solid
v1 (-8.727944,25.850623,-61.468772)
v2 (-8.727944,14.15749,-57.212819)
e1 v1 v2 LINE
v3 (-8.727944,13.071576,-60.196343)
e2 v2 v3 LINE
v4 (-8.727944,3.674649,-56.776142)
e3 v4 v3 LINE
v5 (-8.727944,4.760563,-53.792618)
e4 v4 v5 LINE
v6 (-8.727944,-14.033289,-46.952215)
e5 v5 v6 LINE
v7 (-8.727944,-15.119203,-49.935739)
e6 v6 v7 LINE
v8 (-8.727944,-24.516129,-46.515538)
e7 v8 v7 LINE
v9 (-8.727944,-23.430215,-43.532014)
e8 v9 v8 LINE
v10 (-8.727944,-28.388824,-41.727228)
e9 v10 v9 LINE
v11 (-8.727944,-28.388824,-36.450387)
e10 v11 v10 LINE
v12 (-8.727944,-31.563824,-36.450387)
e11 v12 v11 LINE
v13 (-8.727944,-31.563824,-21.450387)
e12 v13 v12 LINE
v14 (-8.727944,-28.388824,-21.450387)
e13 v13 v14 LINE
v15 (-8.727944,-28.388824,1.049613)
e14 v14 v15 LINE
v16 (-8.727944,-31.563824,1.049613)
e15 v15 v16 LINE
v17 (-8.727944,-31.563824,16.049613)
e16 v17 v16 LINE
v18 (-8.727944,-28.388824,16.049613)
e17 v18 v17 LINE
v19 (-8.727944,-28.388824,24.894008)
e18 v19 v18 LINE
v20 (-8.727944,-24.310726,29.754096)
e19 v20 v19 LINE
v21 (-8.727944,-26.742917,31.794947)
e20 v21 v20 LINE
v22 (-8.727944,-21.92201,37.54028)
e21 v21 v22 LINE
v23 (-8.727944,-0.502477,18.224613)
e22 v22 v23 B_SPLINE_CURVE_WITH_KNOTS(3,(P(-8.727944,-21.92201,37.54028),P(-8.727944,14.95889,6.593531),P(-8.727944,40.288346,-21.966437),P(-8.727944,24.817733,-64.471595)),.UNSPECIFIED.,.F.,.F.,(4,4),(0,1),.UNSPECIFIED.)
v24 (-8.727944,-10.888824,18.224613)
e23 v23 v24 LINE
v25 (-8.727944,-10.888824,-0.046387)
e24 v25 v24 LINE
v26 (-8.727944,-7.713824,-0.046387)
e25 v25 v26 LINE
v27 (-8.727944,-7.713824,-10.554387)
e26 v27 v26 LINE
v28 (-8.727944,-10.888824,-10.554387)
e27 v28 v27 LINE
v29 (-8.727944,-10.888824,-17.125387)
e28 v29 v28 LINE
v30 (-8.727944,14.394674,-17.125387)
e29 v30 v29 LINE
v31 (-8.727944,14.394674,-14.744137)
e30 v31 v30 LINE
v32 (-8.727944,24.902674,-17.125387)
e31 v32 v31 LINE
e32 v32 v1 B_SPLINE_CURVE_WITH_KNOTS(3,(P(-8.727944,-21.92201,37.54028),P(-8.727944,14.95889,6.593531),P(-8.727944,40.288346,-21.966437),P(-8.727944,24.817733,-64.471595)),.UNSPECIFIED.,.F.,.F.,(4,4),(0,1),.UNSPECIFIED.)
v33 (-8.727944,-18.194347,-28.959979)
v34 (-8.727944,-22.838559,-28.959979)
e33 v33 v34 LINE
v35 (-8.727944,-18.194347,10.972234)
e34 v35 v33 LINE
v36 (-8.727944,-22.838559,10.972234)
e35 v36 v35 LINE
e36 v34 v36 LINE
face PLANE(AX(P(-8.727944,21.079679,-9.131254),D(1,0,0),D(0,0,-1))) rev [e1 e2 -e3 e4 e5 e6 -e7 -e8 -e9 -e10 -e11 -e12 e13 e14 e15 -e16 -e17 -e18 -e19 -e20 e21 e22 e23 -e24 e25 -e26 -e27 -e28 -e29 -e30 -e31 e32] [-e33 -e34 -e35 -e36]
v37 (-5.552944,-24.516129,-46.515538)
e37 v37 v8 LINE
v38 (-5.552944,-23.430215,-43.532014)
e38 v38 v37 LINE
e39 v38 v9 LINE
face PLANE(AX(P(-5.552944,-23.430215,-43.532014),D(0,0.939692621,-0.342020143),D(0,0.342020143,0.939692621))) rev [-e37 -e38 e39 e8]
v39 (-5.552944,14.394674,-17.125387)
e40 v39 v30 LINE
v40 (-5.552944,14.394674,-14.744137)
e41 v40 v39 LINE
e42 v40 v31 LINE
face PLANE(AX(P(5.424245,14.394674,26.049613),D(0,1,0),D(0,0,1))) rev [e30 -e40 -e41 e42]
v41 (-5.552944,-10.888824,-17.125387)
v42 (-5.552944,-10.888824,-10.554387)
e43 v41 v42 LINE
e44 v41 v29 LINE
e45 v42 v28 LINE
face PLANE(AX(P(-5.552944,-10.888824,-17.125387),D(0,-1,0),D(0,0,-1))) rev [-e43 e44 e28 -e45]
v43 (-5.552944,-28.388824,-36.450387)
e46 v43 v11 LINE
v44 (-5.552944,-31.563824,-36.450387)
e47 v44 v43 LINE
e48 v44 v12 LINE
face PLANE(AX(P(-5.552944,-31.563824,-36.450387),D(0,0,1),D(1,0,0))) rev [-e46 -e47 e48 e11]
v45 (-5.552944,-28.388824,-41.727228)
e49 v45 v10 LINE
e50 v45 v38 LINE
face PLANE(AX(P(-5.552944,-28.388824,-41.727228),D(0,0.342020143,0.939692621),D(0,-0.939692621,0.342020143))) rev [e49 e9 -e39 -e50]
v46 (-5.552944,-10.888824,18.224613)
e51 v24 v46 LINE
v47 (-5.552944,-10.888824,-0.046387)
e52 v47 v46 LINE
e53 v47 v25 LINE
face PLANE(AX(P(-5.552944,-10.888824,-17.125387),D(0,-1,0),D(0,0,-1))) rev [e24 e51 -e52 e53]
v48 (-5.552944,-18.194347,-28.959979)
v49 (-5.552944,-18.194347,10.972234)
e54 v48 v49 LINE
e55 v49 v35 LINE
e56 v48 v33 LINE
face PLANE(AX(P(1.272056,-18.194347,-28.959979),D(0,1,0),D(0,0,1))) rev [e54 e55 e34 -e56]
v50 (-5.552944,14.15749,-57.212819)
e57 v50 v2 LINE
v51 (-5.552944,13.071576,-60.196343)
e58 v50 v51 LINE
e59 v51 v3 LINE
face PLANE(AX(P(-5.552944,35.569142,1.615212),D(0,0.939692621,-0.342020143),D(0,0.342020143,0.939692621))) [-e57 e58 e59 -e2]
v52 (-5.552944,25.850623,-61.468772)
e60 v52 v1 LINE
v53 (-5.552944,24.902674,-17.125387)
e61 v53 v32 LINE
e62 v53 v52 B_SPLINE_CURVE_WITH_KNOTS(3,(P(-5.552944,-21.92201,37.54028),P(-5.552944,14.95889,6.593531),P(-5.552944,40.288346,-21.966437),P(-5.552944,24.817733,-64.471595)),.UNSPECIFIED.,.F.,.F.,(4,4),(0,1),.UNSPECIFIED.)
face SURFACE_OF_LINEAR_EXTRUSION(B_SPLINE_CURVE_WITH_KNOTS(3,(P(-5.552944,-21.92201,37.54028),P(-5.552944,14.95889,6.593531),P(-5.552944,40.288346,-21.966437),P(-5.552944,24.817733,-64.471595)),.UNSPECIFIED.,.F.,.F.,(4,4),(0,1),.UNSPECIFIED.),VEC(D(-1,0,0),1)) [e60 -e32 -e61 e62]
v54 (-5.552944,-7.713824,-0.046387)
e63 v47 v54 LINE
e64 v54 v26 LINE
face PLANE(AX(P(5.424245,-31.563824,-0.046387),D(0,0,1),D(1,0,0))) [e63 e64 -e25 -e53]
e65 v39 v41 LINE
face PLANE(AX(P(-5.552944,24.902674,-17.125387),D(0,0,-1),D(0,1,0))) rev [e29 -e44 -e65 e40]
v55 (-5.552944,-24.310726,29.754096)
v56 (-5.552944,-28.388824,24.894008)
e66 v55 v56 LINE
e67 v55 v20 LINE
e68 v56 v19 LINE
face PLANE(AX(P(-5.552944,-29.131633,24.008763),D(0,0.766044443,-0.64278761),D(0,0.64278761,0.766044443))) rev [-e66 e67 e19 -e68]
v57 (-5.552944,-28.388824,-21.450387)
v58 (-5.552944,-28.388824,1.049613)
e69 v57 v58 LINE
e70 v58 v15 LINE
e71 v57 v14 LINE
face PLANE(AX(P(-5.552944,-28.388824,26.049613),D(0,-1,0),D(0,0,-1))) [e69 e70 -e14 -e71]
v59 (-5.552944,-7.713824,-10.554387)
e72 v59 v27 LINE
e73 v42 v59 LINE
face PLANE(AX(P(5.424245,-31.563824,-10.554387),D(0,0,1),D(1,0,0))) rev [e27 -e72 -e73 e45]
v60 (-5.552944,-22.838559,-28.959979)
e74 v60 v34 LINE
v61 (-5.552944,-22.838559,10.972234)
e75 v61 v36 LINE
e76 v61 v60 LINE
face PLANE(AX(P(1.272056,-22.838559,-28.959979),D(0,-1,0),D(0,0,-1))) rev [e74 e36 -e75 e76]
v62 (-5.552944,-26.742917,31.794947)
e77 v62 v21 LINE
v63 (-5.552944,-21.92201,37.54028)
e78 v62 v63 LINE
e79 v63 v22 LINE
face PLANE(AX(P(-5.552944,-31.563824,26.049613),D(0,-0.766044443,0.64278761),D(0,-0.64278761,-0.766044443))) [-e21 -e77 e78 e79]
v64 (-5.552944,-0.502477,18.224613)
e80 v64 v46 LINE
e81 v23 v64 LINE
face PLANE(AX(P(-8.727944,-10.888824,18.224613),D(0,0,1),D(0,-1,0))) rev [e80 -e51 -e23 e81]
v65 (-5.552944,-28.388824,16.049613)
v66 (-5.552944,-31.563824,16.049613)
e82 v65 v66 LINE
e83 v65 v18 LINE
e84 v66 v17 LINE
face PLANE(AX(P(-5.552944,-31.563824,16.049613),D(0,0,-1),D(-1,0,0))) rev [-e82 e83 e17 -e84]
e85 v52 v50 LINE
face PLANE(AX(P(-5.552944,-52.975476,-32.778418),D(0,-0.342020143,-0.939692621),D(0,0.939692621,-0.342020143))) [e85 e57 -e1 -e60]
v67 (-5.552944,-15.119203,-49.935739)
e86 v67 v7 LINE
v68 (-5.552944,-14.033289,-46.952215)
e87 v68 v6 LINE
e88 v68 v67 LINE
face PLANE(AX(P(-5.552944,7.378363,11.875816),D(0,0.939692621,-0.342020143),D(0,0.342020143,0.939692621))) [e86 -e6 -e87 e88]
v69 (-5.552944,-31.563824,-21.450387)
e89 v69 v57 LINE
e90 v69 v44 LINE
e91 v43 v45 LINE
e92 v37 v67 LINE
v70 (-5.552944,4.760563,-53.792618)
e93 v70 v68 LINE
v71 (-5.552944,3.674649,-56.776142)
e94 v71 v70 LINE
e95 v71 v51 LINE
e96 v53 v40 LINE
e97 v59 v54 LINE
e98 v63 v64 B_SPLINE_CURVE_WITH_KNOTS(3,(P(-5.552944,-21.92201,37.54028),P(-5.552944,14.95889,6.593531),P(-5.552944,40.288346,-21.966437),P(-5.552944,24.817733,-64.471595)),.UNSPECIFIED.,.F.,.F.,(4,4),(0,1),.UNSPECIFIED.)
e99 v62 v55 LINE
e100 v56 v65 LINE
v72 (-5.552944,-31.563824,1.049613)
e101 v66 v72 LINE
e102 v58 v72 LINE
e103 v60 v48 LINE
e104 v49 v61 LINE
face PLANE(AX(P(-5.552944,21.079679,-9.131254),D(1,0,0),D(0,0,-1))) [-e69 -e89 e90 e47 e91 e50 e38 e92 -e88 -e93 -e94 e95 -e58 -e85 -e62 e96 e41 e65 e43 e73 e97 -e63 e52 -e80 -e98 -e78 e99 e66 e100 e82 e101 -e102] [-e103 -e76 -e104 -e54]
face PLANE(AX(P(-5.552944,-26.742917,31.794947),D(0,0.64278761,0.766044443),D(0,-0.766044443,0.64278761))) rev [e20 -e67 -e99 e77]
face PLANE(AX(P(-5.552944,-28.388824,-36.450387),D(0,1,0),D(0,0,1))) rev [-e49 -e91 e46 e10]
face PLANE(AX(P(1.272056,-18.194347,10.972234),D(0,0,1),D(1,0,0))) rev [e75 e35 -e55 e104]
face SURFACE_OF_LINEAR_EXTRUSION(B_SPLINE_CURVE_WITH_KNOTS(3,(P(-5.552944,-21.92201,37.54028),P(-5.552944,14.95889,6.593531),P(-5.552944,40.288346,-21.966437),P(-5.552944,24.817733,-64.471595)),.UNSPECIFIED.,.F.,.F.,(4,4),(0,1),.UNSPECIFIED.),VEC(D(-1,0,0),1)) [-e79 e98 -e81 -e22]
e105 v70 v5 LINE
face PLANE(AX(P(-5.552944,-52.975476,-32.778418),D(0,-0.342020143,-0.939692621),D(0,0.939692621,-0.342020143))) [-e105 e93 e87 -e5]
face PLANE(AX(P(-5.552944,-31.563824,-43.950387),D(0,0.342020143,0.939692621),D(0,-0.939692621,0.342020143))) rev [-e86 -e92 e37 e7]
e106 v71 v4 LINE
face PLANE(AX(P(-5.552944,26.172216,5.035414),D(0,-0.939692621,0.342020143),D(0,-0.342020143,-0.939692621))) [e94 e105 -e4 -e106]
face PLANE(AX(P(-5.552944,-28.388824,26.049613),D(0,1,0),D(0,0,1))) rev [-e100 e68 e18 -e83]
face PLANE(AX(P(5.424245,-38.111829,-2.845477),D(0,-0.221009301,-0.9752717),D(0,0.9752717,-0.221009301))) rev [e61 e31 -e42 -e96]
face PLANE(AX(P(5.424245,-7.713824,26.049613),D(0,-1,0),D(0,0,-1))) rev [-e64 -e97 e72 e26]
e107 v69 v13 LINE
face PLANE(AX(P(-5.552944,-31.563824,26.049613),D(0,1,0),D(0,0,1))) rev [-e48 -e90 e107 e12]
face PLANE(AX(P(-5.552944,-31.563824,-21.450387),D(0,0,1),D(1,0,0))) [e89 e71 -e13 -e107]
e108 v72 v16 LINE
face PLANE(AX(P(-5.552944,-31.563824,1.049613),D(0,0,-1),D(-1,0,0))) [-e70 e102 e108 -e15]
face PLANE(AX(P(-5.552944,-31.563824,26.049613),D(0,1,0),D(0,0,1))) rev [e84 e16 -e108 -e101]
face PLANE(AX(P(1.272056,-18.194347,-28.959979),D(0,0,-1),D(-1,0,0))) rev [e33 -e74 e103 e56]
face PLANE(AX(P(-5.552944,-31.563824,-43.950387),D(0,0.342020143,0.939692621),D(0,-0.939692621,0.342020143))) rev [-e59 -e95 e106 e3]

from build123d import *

# Parameters (mm, degrees)
VERTICALSUPPORT_START     = -8.727944435
VERTICALSUPPORT_OUTLINE_W = 4.644211625
VERTICALSUPPORT_OUTLINE_H = 39.932212354
VERTICALSUPPORT_DEPTH     = 3.175
SKETCH1_W                 = 7.5
SKETCH1_H                 = 17.511250173
CUT_EXTRUDE1_DEPTH        = 70.171999778


# Read off the part's stored shape, not the designer's step: VerticalSupport
with BuildPart() as part:
    # VerticalSupport outline → VerticalSupport (new body)
    with BuildSketch(Plane.YZ.offset(VERTICALSUPPORT_START)):
        with BuildLine():
            Line((3.674649338, -56.776141905), (13.071575546, -60.196343338))
            Line((13.071575546, -60.196343338), (14.157489501, -57.212819267))
            Line((14.157489501, -57.212819267), (25.850623416, -61.468771968))
            add(Edge.make_bspline(
                [(24.902673716, -17.12538653), (30.294038787, -30.457344803), (31.214851934, -44.900745737), (25.850623416, -61.468771968)],
                knots=[0.580400882, 0.580400882, 0.580400882, 0.580400882, 0.976268241, 0.976268241, 0.976268241, 0.976268241], degree=3))
            Line((24.902673716, -17.12538653), (14.394673716, -14.74413653))
            Line((14.394673716, -14.74413653), (14.394673716, -17.12538653))
            Line((14.394673716, -17.12538653), (-10.888823942, -17.12538653))
            Line((-10.888823942, -17.12538653), (-10.888823942, -10.55438653))
            Line((-10.888823942, -10.55438653), (-7.713823942, -10.55438653))
            Line((-7.713823942, -10.55438653), (-7.713823942, -0.04638653))
            Line((-7.713823942, -0.04638653), (-10.888823942, -0.04638653))
            Line((-10.888823942, -0.04638653), (-10.888823942, 10.72461347))
            Line((-10.888823942, 10.72461347), (6.622426231, 10.72461347))
            add(Edge.make_bspline(
                [(-21.922009797, 37.540280116), (-11.188458316, 28.533761028), (-1.433315203, 19.729402601), (6.622426231, 10.72461347)],
                knots=[0, 0, 0, 0, 0.291032797, 0.291032797, 0.291032797, 0.291032797], degree=3))
            Line((-21.922009797, 37.540280116), (-26.742916869, 31.794946793))
            Line((-26.742916869, 31.794946793), (-24.310725762, 29.754096132))
            Line((-24.310725762, 29.754096132), (-28.388823942, 24.894007976))
            Line((-28.388823942, 24.894007976), (-28.388823942, 16.04961347))
            Line((-28.388823942, 16.04961347), (-31.563823942, 16.04961347))
            Line((-31.563823942, 16.04961347), (-31.563823942, 1.04961347))
            Line((-31.563823942, 1.04961347), (-28.388823942, 1.04961347))
            Line((-28.388823942, 1.04961347), (-28.388823942, -21.45038653))
            Line((-28.388823942, -21.45038653), (-31.563823942, -21.45038653))
            Line((-31.563823942, -21.45038653), (-31.563823942, -36.45038653))
            Line((-31.563823942, -36.45038653), (-28.388823942, -36.45038653))
            Line((-28.388823942, -36.45038653), (-28.388823942, -41.727227597))
            Line((-28.388823942, -41.727227597), (-23.430215331, -43.532013534))
            Line((-23.430215331, -43.532013534), (-24.516129286, -46.515537605))
            Line((-24.516129286, -46.515537605), (-15.119203078, -49.935739039))
            Line((-15.119203078, -49.935739039), (-14.033289123, -46.952214968))
            Line((-14.033289123, -46.952214968), (4.760563293, -53.792617834))
            Line((4.760563293, -53.792617834), (3.674649338, -56.776141905))
        make_face()
        with Locations((-20.51645306, -8.993872337)):
            Rectangle(VERTICALSUPPORT_OUTLINE_W, VERTICALSUPPORT_OUTLINE_H, mode=Mode.SUBTRACT)
    extrude(amount=VERTICALSUPPORT_DEPTH)

    # Sketch1 → Cut-Extrude1 (cut, through all)
    with BuildSketch(Plane(origin=(-5.552944435, 0, 0), x_dir=(0, 0, -1), z_dir=(1, 0, 0))):
        with Locations((-14.47461347, -2.133198855)):
            Rectangle(SKETCH1_W, SKETCH1_H)
    extrude(amount=-CUT_EXTRUDE1_DEPTH, mode=Mode.SUBTRACT)


solid = part.part
